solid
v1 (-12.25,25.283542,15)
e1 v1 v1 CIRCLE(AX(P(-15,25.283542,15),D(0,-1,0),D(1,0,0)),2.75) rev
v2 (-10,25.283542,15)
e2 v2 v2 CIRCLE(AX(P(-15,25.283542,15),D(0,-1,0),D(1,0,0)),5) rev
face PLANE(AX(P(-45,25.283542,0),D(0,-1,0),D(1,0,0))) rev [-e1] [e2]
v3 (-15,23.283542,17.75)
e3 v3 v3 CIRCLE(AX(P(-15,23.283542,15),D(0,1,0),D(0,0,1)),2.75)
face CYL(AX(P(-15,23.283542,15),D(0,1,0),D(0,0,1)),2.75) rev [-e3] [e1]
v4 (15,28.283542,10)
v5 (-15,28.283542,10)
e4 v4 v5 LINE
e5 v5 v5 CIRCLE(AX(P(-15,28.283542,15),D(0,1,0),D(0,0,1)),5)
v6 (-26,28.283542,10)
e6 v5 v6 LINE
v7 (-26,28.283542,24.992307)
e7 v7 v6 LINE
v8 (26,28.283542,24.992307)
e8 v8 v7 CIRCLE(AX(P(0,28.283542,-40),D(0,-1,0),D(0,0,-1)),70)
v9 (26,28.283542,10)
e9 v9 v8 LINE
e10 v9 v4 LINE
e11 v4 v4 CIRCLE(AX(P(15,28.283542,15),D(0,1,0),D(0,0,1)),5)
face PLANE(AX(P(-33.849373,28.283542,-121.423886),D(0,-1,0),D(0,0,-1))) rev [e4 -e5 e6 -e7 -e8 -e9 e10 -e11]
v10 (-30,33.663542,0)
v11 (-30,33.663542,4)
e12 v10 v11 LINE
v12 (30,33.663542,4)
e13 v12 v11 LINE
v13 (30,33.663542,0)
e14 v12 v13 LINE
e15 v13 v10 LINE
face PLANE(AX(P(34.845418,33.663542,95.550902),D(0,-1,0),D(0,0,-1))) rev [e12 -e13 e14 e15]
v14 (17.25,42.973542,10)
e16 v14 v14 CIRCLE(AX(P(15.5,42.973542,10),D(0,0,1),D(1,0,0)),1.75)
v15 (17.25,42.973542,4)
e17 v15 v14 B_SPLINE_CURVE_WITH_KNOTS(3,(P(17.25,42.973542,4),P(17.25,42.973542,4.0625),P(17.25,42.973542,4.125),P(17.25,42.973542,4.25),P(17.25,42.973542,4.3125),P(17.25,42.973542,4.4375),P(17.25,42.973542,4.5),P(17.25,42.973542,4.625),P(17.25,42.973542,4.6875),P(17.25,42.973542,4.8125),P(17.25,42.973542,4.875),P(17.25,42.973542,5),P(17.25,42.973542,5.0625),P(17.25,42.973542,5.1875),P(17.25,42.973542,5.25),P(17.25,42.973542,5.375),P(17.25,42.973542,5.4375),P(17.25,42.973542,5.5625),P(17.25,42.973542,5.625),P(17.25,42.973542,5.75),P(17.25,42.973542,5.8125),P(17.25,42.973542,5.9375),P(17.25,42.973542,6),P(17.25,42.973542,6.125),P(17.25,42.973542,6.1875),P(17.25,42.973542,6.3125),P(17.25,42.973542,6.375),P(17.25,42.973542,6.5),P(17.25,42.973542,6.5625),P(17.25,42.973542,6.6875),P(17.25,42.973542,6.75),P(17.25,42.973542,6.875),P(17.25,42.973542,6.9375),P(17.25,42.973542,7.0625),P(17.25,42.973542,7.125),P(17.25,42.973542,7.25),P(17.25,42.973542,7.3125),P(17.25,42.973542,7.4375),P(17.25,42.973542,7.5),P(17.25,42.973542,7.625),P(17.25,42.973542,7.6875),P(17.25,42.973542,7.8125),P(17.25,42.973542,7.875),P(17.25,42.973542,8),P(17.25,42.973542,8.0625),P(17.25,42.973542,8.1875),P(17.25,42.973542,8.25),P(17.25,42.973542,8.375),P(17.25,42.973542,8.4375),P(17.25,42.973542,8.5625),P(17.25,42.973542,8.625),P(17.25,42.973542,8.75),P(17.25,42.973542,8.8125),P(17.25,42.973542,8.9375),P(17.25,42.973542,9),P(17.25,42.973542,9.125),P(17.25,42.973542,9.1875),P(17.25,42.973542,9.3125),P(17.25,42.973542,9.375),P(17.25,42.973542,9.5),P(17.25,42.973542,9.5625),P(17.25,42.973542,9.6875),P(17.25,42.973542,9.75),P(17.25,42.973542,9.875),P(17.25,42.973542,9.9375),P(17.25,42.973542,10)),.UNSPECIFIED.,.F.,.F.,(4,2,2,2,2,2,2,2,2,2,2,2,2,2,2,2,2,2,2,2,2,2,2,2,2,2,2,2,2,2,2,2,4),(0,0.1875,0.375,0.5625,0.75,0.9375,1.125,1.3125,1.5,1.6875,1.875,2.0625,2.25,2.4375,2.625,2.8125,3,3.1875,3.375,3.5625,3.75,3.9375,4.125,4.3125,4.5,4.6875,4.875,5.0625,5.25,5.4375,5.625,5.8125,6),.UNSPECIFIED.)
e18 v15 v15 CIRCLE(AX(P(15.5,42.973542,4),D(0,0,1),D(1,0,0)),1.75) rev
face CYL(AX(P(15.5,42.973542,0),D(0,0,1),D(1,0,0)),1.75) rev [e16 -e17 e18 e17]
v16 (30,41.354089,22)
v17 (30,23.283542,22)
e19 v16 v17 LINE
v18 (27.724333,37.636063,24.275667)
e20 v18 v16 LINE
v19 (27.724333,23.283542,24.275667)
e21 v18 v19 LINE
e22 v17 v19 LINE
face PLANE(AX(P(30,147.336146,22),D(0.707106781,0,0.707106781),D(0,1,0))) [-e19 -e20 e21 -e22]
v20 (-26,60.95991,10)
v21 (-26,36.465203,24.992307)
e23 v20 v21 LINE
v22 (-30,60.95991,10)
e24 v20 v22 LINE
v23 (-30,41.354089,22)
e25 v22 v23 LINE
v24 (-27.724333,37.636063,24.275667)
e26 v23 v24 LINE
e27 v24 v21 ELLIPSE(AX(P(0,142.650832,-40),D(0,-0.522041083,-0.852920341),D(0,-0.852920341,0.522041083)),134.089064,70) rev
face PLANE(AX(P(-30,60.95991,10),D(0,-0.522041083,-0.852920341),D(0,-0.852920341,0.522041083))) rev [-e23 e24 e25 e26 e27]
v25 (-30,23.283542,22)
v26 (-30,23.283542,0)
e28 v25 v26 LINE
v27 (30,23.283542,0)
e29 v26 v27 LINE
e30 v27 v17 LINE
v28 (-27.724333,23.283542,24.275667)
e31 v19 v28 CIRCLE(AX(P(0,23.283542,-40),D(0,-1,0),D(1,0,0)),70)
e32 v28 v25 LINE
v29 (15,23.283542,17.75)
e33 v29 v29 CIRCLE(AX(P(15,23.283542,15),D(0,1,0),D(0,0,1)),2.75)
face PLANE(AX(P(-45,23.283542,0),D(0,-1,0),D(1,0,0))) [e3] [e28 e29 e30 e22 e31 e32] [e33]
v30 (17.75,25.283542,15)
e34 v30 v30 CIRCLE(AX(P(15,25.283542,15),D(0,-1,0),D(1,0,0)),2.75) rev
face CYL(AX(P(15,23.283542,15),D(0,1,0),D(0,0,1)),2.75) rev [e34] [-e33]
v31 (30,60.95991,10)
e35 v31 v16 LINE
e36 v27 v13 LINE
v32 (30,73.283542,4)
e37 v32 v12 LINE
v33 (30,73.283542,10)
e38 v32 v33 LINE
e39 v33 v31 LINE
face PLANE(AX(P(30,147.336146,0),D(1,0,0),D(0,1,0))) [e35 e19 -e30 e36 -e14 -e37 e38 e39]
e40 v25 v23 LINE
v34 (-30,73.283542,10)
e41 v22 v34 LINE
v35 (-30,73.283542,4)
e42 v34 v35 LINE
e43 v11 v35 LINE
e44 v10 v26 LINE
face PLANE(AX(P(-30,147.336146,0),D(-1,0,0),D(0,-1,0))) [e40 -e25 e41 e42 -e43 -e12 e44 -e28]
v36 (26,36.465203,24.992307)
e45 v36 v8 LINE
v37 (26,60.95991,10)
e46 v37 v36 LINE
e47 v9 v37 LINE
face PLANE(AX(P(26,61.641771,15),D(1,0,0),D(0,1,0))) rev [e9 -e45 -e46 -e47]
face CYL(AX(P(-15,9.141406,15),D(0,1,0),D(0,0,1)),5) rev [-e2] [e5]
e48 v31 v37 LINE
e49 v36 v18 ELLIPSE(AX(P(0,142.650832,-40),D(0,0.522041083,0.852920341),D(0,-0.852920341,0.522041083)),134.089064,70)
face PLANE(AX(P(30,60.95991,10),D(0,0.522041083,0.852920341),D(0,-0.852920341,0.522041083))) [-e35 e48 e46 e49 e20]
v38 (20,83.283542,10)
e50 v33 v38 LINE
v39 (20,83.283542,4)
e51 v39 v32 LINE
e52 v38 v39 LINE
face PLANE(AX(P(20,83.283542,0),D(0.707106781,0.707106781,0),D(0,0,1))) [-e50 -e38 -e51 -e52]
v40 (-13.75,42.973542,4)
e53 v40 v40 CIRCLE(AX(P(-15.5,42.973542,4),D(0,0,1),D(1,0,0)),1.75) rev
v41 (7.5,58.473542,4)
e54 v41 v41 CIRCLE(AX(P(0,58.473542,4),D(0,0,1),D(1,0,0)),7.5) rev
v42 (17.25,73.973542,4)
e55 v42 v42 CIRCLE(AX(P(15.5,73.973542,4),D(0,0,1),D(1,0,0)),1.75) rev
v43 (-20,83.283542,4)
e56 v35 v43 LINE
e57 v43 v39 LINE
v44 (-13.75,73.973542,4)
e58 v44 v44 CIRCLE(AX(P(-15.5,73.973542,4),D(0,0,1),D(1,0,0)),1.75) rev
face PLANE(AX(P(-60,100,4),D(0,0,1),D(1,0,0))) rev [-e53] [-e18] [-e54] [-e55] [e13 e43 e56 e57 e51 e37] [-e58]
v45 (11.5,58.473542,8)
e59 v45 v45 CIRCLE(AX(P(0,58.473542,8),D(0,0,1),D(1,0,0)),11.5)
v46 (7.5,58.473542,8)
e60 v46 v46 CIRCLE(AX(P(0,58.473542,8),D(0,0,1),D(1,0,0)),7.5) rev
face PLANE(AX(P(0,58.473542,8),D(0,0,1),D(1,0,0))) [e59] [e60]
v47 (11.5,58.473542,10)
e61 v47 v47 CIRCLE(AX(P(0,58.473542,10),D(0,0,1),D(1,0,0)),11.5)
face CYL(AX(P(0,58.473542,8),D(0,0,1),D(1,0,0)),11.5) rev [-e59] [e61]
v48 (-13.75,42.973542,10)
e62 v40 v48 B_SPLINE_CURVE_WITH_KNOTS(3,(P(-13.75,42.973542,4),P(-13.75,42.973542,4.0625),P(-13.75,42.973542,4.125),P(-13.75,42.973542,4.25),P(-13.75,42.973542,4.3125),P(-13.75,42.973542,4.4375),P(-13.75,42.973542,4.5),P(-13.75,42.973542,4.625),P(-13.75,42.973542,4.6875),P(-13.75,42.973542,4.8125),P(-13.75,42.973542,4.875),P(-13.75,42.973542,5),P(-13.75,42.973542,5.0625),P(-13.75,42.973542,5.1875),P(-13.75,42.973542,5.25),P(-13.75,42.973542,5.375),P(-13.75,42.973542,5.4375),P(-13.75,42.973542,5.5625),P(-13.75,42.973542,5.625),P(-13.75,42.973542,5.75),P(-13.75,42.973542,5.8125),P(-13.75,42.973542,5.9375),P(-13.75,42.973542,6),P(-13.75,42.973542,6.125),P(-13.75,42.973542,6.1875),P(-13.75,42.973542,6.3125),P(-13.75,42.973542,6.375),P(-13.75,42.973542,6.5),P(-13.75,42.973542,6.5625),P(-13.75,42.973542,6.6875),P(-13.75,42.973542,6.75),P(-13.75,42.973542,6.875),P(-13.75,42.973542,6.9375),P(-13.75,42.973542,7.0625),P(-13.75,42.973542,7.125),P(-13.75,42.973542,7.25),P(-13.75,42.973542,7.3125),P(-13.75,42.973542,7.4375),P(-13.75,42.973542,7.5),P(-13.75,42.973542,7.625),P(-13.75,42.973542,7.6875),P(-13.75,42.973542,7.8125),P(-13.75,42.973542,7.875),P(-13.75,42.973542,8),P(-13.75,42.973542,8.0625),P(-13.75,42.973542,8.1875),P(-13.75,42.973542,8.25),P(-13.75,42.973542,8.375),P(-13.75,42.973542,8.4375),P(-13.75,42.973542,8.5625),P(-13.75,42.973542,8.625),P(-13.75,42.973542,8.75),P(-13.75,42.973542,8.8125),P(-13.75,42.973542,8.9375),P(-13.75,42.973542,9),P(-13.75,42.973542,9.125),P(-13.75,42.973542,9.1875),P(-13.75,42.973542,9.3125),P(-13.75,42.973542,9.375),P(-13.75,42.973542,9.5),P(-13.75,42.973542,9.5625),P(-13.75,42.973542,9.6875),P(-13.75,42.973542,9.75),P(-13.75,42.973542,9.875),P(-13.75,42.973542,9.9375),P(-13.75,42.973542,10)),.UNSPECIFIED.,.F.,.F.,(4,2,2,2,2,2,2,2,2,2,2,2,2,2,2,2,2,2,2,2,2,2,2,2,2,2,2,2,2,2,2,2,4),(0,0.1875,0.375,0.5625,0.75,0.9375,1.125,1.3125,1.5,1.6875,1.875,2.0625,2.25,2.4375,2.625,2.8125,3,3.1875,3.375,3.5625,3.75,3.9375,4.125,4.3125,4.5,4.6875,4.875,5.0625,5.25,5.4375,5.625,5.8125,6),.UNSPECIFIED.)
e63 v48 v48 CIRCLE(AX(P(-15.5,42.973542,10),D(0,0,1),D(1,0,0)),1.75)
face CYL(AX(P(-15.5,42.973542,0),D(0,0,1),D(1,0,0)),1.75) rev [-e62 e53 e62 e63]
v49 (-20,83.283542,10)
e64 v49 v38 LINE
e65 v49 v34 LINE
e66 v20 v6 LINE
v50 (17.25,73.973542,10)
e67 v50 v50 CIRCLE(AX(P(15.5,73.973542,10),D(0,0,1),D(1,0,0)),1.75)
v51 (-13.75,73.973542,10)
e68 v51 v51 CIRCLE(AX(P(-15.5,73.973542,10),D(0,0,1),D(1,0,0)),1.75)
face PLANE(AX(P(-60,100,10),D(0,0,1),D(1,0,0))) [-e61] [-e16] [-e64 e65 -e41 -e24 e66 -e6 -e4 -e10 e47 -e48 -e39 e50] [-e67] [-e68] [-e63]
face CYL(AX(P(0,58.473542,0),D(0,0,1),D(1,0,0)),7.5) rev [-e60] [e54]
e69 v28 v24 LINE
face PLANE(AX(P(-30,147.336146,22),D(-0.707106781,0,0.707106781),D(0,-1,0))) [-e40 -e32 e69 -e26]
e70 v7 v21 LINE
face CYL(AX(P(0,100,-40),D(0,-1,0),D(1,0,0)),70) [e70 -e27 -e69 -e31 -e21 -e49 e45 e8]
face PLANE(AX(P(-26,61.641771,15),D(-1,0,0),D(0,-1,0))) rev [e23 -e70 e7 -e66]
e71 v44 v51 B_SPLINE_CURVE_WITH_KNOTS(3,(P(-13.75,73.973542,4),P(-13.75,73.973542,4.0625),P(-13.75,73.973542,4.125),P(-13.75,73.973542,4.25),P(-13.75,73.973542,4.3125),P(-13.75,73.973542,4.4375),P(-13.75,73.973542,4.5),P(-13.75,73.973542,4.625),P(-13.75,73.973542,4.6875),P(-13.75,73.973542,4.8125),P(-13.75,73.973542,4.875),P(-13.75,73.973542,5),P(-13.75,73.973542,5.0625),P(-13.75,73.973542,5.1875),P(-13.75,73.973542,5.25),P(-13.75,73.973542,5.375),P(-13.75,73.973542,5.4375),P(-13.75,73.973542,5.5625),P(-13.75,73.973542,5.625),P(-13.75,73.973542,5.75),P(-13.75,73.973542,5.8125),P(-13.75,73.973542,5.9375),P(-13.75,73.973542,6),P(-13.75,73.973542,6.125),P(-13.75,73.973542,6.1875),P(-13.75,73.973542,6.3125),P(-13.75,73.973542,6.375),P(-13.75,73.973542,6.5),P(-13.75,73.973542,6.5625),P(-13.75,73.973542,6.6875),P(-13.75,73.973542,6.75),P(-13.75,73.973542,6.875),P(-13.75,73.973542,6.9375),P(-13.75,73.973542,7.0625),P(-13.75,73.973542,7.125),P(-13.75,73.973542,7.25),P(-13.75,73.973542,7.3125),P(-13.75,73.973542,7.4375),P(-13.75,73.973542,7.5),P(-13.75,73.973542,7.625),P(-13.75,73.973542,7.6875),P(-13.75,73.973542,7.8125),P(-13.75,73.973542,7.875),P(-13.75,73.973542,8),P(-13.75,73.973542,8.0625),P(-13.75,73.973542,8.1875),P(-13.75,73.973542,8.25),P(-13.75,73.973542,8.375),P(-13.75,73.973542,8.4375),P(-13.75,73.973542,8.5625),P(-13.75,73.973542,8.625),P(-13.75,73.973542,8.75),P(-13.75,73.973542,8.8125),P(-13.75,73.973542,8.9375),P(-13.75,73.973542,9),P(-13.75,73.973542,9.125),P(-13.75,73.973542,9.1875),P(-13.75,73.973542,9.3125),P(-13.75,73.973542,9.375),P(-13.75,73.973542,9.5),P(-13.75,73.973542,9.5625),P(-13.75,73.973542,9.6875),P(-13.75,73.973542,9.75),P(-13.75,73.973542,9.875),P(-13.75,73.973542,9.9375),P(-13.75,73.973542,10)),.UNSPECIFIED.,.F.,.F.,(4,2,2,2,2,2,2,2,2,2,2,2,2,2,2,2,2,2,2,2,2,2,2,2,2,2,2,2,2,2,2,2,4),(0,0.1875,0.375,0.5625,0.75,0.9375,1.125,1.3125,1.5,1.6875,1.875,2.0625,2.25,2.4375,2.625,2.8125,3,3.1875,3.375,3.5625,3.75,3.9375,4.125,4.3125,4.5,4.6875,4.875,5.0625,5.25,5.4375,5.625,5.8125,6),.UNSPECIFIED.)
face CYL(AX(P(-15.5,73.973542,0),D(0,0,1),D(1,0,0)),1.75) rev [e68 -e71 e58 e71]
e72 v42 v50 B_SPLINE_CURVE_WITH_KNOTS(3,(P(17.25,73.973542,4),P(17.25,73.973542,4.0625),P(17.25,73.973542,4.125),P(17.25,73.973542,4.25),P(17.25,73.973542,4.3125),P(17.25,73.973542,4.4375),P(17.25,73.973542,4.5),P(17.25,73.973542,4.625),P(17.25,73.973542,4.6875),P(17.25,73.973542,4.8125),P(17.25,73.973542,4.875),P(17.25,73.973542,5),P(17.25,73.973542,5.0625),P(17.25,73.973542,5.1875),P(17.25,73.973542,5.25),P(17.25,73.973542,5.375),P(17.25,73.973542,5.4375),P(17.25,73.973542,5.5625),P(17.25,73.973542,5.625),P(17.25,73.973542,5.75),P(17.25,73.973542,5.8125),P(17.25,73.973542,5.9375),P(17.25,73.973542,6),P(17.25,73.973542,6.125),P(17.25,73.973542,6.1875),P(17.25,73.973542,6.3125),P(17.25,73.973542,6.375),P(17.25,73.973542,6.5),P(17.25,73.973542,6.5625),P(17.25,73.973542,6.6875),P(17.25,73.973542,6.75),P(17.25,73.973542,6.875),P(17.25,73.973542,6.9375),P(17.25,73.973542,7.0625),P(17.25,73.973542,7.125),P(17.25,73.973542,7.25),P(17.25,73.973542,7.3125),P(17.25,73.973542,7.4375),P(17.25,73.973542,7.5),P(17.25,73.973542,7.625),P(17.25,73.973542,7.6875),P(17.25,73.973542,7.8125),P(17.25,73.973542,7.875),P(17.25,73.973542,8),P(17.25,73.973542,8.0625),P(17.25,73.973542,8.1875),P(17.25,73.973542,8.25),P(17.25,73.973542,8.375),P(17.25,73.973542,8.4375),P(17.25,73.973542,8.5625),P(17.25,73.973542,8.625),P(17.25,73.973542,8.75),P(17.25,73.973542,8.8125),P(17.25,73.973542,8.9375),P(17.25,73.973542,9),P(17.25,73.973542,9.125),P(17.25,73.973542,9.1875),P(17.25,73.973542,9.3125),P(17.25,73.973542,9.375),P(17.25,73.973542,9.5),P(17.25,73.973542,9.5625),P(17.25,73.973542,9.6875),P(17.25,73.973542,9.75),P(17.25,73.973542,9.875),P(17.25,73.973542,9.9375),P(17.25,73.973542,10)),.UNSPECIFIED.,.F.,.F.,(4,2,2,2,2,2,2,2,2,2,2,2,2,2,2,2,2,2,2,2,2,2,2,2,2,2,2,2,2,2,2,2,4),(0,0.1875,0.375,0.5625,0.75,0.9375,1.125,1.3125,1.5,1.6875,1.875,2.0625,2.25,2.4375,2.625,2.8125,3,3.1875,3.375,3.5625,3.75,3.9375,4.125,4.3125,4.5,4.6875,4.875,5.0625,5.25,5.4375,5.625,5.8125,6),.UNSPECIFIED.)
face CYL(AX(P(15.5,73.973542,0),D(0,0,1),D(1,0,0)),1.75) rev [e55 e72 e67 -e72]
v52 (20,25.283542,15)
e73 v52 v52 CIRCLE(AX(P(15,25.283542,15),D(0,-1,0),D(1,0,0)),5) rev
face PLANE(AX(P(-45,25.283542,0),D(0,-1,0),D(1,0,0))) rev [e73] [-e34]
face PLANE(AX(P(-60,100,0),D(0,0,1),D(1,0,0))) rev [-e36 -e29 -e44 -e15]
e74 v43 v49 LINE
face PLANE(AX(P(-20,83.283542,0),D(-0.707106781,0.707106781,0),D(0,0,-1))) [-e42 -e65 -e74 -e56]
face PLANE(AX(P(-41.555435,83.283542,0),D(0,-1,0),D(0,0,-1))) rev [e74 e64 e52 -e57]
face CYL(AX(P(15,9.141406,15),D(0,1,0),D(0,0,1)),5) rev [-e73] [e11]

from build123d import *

# Parameters (mm, degrees)
SKETCH1_W                = 120
SKETCH1_H                = 30
BOSS_EXTRUDE1_DEPTH      = 100
SKETCH3_OUTSIDE_W        = 153.812
SKETCH3_OUTSIDE_H        = 133.812
CUT_EXTRUDE2_DEPTH       = 121.415945788
CUT_EXTRUDE3_START       = -30
CUT_EXTRUDE3_DEPTH       = 30
SKETCH5_W                = 67.698745078
SKETCH5_H                = 100.8
CUT_EXTRUDE4_DEPTH       = 20
RIB1_REACH               = 122.416
SKETCH6_WALL_W           = 281.143052644
SKETCH6_WALL_H           = 4
RIB6_REACH               = 122.416
SKETCH7_WALL_W           = 281.143052644
SKETCH7_WALL_H           = 4
CUT_EXTRUDE5_DEPTH       = 84.326168543
CUT_EXTRUDE5_DEPTH_BACK  = 84.326168543
SKETCH9_R                = 2.75
SKETCH10_R               = 5
CUT_EXTRUDE6_DEPTH       = 3
CHAMFER1_SIZE            = 8
CUT_EXTRUDE7_START       = -14.352520936
CUT_EXTRUDE7_DEPTH       = 14.352520936
SKETCH13_W               = 60
SKETCH13_H               = 40
BOSS_EXTRUDE2_DEPTH      = 10
CUT_EXTRUDE8_DEPTH       = 108.204960324
CUT_EXTRUDE8_DEPTH_BACK  = 108.204960324
SKETCH12_R               = 1.75
SKETCH12_R_2             = 7.5
CHAMFER2_SIZE            = 10
SKETCH14_R               = 11.5
CUT_EXTRUDE9_DEPTH       = 1
BOSS_EXTRUDE3_START      = 1
SKETCH16_W               = 42.5
SKETCH16_H               = 42.5
SKETCH16_R               = 1.75
SKETCH16_R_2             = 11.5
BOSS_EXTRUDE3_DEPTH      = 1
SKETCH17_W               = 48.072912132
SKETCH17_H               = 52.974055018
BOSS_EXTRUDE4_DEPTH      = 10
SKETCH17_2_W             = 48.072912132
SKETCH17_2_H             = 52.974055018
CUT_EXTRUDE10_DEPTH      = 108.204960324
CUT_EXTRUDE11_DEPTH      = 108.204960324
CUT_EXTRUDE11_DEPTH_BACK = 108.204960324
SKETCH18_R               = 7.5
SKETCH18_R_2             = 1.75
SKETCH19_R               = 11.5
CUT_EXTRUDE12_DEPTH      = 2
CUT_EXTRUDE13_DEPTH      = 108.204960324
CUT_EXTRUDE13_DEPTH_BACK = 108.204960324
SKETCH20_W               = 88.74197012
SKETCH20_H               = 29.925009901
CHAMFER3_SIZE            = 10
SKETCH22_W               = 69.690835078
SKETCH22_H               = 49.62
CUT_EXTRUDE14_DEPTH      = 4


# Read off the part's stored shape, not the designer's step: Cut-Extrude3, Cut-Extrude7
with BuildPart() as part:
    # Sketch1 → Boss-Extrude1 (new body)
    with BuildSketch(Plane(origin=(0, 0, 0), x_dir=(1, 0, 0), z_dir=(0, 1, 0))):
        with Locations((0, -15)):
            Rectangle(SKETCH1_W, SKETCH1_H)
    extrude(amount=BOSS_EXTRUDE1_DEPTH)

    # Sketch3 outside → Cut-Extrude2 (cut, through all)
    with BuildSketch(Plane.XY.offset(30)):
        with Locations((0, 50)):
            Rectangle(SKETCH3_OUTSIDE_W, SKETCH3_OUTSIDE_H)
        with BuildLine():
            Line((-45, 23.283541889), (45, 23.283541889))
            Line((45, 23.283541889), (19.804596008, 86.568297014))
            ThreePointArc((19.804596008, 86.568297014), (0, 100), (-19.804596008, 86.568297014))
            Line((-19.804596008, 86.568297014), (-45, 23.283541889))
        make_face(mode=Mode.SUBTRACT)
    extrude(amount=-CUT_EXTRUDE2_DEPTH, mode=Mode.SUBTRACT)

    # Cut-Extrude3 outline → Cut-Extrude3 (cut)
    with BuildSketch(Plane.XY.offset(30).offset(CUT_EXTRUDE3_START)):
        Polygon((30, 60.95991045), (30, 23.283541889), (45, 23.283541889), align=None)
        Polygon((-30, 23.283541889), (-30, 60.95991045), (-45, 23.283541889), align=None)
    extrude(amount=CUT_EXTRUDE3_DEPTH, mode=Mode.SUBTRACT)

    # Sketch5 → Cut-Extrude4 (cut)
    with BuildSketch(Plane.XY.offset(30)):
        with Locations((0, 78.683541889)):
            Rectangle(SKETCH5_W, SKETCH5_H)
    extrude(amount=-CUT_EXTRUDE4_DEPTH, mode=Mode.SUBTRACT)

    # Sketch6 wall → Rib1 (add, up to next)
    with BuildSketch(Plane(origin=(-30, 44.62172617, 20), x_dir=(0, -0.852920340981, 0.522041082618), z_dir=(0, 0.522041082618, 0.852920340981)), mode=Mode.PRIVATE) as rib1_sk1:
        with Locations((0, 2)):
            Rectangle(SKETCH6_WALL_W, SKETCH6_WALL_H)
    rib1_tool1 = extrude(rib1_sk1.sketch, amount=-RIB1_REACH, mode=Mode.PRIVATE) - part.part
    add(rib1_tool1.solids().sort_by_distance((-30, 44.62172617, 20))[0])

    # Sketch7 wall → Rib6 (add, up to next)
    with BuildSketch(Plane(origin=(30, 44.62172617, 20), x_dir=(0, -0.852920340981, 0.522041082618), z_dir=(0, -0.522041082618, -0.852920340981)), mode=Mode.PRIVATE) as rib6_sk1:
        with Locations((0, 2)):
            Rectangle(SKETCH7_WALL_W, SKETCH7_WALL_H)
    rib6_tool1 = extrude(rib6_sk1.sketch, amount=RIB6_REACH, mode=Mode.PRIVATE) - part.part
    add(rib6_tool1.solids().sort_by_distance((30, 44.62172617, 20))[0])

    # Sketch9 → Cut-Extrude5 (cut, two sides: drawn at the far end of the back side and taken through both)
    with BuildSketch(Plane(origin=(0, 28.283541889, 0), x_dir=(1, 0, 0), z_dir=(0, 1, 0)).offset(-CUT_EXTRUDE5_DEPTH_BACK)):
        with Locations(Location((-15, -15, 0), (0, 0, 270))):
            Circle(SKETCH9_R)
        with Locations(Location((15, -15, 0), (0, 0, 270))):
            Circle(SKETCH9_R)
    extrude(amount=CUT_EXTRUDE5_DEPTH + CUT_EXTRUDE5_DEPTH_BACK, mode=Mode.SUBTRACT)

    # Sketch10 → Cut-Extrude6 (cut)
    with BuildSketch(Plane(origin=(0, 28.283541889, 0), x_dir=(1, 0, 0), z_dir=(0, 1, 0))):
        with Locations((-15, -15)):
            Circle(SKETCH10_R)
        with Locations((15, -15)):
            Circle(SKETCH10_R)
    extrude(amount=-CUT_EXTRUDE6_DEPTH, mode=Mode.SUBTRACT)

    # Chamfer1
    # the kernel refuses this chamfer: 8 mm, written as the material it takes off along each edge
    with BuildSketch(Plane(origin=(-30, 2.710077985, 30), x_dir=(-0.027495876610586535, 0, -0.9996219169112968), z_dir=(0, 1, 0))) as chamfer1_piece_1:
        Polygon((CHAMFER1_SIZE * 0.999621916911, -CHAMFER1_SIZE * 0.0274958766106), (-CHAMFER1_SIZE * 0.0274958766106, -CHAMFER1_SIZE * 0.999621916911), (0, 0), align=None)
    extrude(amount=46.146927807, mode=Mode.SUBTRACT)
    with BuildSketch(Plane(origin=(30, 48.857005793, 30), x_dir=(-0.9996219169112968, 0, 0.027495876610586487), z_dir=(0, -1, 0))) as chamfer1_piece_2:
        Polygon((CHAMFER1_SIZE * 0.999621916911, CHAMFER1_SIZE * 0.0274958766106), (-CHAMFER1_SIZE * 0.0274958766106, CHAMFER1_SIZE * 0.999621916911), (0, 0), align=None)
    extrude(amount=46.146927807, mode=Mode.SUBTRACT)

    # Cut-Extrude7 outline → Cut-Extrude7 (cut)
    with BuildSketch(Plane.XZ.offset(-23.283541889).offset(CUT_EXTRUDE7_START)):
        with BuildLine():
            ThreePointArc((-27.724333118, 24.275666882), (-14.154563191, 28.553981218), (0, 30))
            Line((0, 30), (-22, 30))
            Line((-22, 30), (-27.724333118, 24.275666882))
        make_face()
        with BuildLine():
            ThreePointArc((0, 30), (14.154563191, 28.553981218), (27.724333118, 24.275666882))
            Line((27.724333118, 24.275666882), (22, 30))
            Line((22, 30), (0, 30))
        make_face()
    extrude(amount=CUT_EXTRUDE7_DEPTH, mode=Mode.SUBTRACT)

    # Sketch13 → Boss-Extrude2 (add)
    with BuildSketch(Plane(origin=(0, 0, 0), x_dir=(-1, 0, 0), z_dir=(0, 0, -1))):
        with Locations((0, 80.95991045)):
            Rectangle(SKETCH13_W, SKETCH13_H)
    extrude(amount=-BOSS_EXTRUDE2_DEPTH)

    # Sketch12 → Cut-Extrude8 (cut, two sides: drawn at the far end of the back side and taken through both)
    with BuildSketch(Plane.XY.offset(10).offset(-CUT_EXTRUDE8_DEPTH_BACK)):
        with Locations((-15.5, 84.083541889)):
            Circle(SKETCH12_R)
        with Locations((15.5, 84.083541889)):
            Circle(SKETCH12_R)
        with Locations((-15.5, 53.083541889)):
            Circle(SKETCH12_R)
        with Locations((15.5, 53.083541889)):
            Circle(SKETCH12_R)
        with Locations((0, 68.583541889)):
            Circle(SKETCH12_R_2)
    extrude(amount=CUT_EXTRUDE8_DEPTH + CUT_EXTRUDE8_DEPTH_BACK, mode=Mode.SUBTRACT)

    # Chamfer2
    chamfer2_edges = [part.edges().sort_by_distance(p)[0] for p in [
        (-30, 100.95991045, 5),
        (30, 100.95991045, 5),
    ]]
    chamfer(chamfer2_edges, length=CHAMFER2_SIZE)

    # Sketch14 → Cut-Extrude9 (cut)
    with BuildSketch(Plane.XY.offset(10)):
        with Locations((0, 68.583541889)):
            Circle(SKETCH14_R)
    extrude(amount=-CUT_EXTRUDE9_DEPTH, mode=Mode.SUBTRACT)

    # Sketch16 → Boss-Extrude3 (add)
    with BuildSketch(Plane.XY.offset(10).offset(BOSS_EXTRUDE3_START)):
        with Locations((0, 68.583541889)):
            Rectangle(SKETCH16_W, SKETCH16_H)
        with Locations((-15.5, 84.083541889)):
            Circle(SKETCH16_R, mode=Mode.SUBTRACT)
        with Locations((15.5, 84.083541889)):
            Circle(SKETCH16_R, mode=Mode.SUBTRACT)
        with Locations((15.5, 53.083541889)):
            Circle(SKETCH16_R, mode=Mode.SUBTRACT)
        with Locations((-15.5, 53.083541889)):
            Circle(SKETCH16_R, mode=Mode.SUBTRACT)
        with Locations((0, 68.583541889)):
            Circle(SKETCH16_R_2, mode=Mode.SUBTRACT)
    extrude(amount=-BOSS_EXTRUDE3_DEPTH)

    # Sketch17 → Boss-Extrude4 (add)
    with BuildSketch(Plane.XY.offset(10)):
        with Locations((0, 67.231428327)):
            Rectangle(SKETCH17_W, SKETCH17_H)
    extrude(amount=-BOSS_EXTRUDE4_DEPTH)

    # Sketch17<2> → Cut-Extrude10 (cut, through all)
    with BuildSketch(Plane.XY.offset(10)):
        with Locations((0, 67.231428327)):
            Rectangle(SKETCH17_2_W, SKETCH17_2_H)
    extrude(amount=CUT_EXTRUDE10_DEPTH, mode=Mode.SUBTRACT)

    # Sketch18 → Cut-Extrude11 (cut, two sides: drawn at the far end of the back side and taken through both)
    with BuildSketch(Plane.XY.offset(10).offset(-CUT_EXTRUDE11_DEPTH_BACK)):
        with Locations((0, 58.473541889)):
            Circle(SKETCH18_R)
        with Locations((-15.5, 73.973541889)):
            Circle(SKETCH18_R_2)
        with Locations((-15.5, 42.973541889)):
            Circle(SKETCH18_R_2)
        with Locations((15.5, 42.973541889)):
            Circle(SKETCH18_R_2)
        with Locations((15.5, 73.973541889)):
            Circle(SKETCH18_R_2)
    extrude(amount=CUT_EXTRUDE11_DEPTH + CUT_EXTRUDE11_DEPTH_BACK, mode=Mode.SUBTRACT)

    # Sketch19 → Cut-Extrude12 (cut)
    with BuildSketch(Plane.XY.offset(10)):
        with Locations((0, 58.473541889)):
            Circle(SKETCH19_R)
    extrude(amount=-CUT_EXTRUDE12_DEPTH, mode=Mode.SUBTRACT)

    # Sketch20 → Cut-Extrude13 (cut, two sides: drawn at the far end of the back side and taken through both)
    with BuildSketch(Plane.XY.offset(10).offset(-CUT_EXTRUDE13_DEPTH_BACK)):
        with Locations((2.815550168, 98.246046839)):
            Rectangle(SKETCH20_W, SKETCH20_H)
    extrude(amount=CUT_EXTRUDE13_DEPTH + CUT_EXTRUDE13_DEPTH_BACK, mode=Mode.SUBTRACT)

    # Chamfer3
    chamfer3_edges = [part.edges().sort_by_distance(p)[0] for p in [
        (30, 83.283541889, 5),
        (-30, 83.283541889, 5),
    ]]
    chamfer(chamfer3_edges, length=CHAMFER3_SIZE)

    # Sketch22 → Cut-Extrude14 (cut)
    with BuildSketch(Plane(origin=(0, 0, 0), x_dir=(-1, 0, 0), z_dir=(0, 0, -1))):
        with Locations((0, 58.473541889)):
            Rectangle(SKETCH22_W, SKETCH22_H)
    extrude(amount=-CUT_EXTRUDE14_DEPTH, mode=Mode.SUBTRACT)


solid = part.part
